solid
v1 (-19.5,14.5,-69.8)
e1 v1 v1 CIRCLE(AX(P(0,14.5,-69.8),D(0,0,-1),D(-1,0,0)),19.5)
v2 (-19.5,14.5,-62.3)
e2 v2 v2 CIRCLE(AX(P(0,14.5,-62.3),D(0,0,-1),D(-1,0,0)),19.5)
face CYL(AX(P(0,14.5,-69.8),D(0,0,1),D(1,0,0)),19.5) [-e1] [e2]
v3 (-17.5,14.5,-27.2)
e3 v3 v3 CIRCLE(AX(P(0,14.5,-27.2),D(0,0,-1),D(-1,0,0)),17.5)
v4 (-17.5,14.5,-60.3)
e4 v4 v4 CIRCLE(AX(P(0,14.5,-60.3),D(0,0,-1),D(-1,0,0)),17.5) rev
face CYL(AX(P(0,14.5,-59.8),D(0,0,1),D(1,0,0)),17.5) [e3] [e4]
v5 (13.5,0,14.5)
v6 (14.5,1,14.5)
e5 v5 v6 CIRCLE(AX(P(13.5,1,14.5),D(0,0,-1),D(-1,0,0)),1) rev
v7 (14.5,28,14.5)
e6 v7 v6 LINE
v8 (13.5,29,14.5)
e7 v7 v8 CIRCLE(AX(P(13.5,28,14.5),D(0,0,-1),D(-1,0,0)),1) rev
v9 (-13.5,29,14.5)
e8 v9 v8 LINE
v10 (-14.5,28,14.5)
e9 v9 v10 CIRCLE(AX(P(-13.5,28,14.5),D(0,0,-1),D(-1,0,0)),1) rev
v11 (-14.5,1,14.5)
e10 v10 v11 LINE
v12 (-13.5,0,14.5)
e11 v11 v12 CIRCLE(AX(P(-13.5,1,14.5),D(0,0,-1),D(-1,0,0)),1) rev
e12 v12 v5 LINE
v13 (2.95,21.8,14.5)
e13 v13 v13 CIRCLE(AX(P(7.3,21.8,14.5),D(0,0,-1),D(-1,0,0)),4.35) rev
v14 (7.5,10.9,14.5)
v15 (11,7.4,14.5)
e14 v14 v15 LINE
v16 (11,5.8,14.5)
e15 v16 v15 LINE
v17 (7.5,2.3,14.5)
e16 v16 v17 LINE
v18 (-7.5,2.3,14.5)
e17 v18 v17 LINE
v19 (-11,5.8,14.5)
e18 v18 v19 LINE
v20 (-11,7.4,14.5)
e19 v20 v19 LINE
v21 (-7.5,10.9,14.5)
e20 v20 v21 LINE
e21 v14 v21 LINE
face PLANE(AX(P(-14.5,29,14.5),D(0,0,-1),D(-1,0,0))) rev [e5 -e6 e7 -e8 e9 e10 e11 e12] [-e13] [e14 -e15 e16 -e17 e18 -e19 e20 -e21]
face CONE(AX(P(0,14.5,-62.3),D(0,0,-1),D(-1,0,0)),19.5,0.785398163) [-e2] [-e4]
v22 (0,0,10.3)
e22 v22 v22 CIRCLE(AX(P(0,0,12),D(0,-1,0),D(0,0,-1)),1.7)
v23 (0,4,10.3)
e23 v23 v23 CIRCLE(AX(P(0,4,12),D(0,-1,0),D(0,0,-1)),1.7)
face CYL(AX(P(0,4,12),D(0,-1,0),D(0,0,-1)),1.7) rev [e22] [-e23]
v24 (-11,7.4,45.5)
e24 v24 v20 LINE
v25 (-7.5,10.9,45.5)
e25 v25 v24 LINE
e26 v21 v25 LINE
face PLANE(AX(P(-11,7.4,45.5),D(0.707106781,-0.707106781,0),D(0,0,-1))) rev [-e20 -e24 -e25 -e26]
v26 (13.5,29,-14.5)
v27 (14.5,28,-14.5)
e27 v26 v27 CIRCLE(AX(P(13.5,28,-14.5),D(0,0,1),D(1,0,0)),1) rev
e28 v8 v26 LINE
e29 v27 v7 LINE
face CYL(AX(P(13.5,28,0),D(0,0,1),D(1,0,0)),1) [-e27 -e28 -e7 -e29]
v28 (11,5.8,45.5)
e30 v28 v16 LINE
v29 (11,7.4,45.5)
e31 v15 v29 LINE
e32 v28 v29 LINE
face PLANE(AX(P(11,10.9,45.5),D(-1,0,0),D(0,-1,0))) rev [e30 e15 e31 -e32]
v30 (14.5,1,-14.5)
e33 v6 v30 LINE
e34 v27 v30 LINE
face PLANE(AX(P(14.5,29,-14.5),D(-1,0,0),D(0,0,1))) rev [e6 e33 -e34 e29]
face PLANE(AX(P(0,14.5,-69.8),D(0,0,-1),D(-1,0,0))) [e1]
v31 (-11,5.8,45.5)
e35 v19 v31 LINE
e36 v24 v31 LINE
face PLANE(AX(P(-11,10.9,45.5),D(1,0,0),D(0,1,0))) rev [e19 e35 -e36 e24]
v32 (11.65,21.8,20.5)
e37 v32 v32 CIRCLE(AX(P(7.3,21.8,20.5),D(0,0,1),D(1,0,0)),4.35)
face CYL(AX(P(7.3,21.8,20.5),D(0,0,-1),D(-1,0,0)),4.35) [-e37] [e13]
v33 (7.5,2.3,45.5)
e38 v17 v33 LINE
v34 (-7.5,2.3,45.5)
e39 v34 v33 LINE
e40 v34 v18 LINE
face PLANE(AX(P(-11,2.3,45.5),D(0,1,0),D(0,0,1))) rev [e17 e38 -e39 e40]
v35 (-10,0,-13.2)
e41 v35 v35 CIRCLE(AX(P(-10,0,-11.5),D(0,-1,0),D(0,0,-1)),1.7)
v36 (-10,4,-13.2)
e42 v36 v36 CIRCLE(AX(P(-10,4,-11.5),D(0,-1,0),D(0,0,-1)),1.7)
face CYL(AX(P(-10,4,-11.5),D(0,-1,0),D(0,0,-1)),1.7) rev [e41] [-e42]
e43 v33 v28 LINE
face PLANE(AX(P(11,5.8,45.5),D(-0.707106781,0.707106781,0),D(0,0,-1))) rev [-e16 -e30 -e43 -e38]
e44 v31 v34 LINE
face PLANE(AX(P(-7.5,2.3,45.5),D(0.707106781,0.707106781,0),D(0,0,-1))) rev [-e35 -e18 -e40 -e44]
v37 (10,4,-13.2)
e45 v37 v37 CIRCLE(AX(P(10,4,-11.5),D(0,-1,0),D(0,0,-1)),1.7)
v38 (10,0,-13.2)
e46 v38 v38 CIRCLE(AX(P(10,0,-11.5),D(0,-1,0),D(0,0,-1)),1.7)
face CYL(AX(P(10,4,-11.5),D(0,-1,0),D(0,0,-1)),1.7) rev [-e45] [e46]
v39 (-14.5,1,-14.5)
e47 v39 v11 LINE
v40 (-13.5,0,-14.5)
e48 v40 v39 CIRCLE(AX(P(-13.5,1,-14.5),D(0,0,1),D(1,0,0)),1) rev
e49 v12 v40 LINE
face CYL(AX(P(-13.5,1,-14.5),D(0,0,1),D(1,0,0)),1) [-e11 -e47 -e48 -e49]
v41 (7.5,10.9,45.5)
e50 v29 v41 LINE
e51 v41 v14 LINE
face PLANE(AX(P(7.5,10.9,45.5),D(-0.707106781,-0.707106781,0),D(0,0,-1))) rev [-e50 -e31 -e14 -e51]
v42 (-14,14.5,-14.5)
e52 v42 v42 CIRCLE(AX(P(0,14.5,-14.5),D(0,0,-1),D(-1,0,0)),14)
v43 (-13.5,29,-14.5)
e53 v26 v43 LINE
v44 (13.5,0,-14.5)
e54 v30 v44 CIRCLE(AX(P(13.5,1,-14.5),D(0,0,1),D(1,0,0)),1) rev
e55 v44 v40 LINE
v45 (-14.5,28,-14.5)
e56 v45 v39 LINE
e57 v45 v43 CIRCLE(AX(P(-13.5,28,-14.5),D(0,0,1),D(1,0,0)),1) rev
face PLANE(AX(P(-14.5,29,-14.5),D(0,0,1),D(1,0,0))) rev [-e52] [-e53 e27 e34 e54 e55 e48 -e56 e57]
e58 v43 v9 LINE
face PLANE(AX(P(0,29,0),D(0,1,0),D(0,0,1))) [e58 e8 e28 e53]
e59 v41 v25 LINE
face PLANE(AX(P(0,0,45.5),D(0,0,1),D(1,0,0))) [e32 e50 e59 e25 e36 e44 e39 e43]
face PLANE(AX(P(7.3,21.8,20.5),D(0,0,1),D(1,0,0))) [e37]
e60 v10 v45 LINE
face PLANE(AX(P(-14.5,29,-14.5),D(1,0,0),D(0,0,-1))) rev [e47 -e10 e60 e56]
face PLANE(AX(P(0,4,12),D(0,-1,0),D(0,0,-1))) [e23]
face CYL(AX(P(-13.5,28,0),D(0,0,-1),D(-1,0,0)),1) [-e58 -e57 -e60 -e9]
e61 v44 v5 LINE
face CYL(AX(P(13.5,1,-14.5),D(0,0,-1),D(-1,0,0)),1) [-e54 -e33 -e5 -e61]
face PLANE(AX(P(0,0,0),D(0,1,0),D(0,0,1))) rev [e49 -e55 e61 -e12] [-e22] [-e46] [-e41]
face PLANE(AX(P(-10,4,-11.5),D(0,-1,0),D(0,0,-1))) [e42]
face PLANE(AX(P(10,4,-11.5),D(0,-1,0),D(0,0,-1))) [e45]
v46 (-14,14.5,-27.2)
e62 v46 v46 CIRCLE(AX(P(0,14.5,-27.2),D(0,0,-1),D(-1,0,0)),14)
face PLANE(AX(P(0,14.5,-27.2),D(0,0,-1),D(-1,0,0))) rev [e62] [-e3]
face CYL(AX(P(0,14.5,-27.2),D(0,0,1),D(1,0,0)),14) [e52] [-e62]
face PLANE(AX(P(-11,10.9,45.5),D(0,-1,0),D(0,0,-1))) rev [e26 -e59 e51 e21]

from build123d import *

# Parameters (mm, degrees)
SKETCH_1_W          = 29
SKETCH_1_H          = 29
EXTRUDE_1_DEPTH     = 29
SKETCH_2_R          = 1.7
CUT_EXTRUDE_1_DEPTH = 4
SKETCH_3_R          = 14
EXTRUDE_2_DEPTH     = 12.7
SKETCH_4_R          = 17.5
EXTRUDE_3_DEPTH     = 32.6
SKETCH_6_R          = 19.5
EXTRUDE_4_DEPTH     = 10
CHAMFER_1_SIZE      = 2.5
FILLET_1_R          = 1
SKETCH_7_W          = 22
SKETCH_7_H          = 8.6
EXTRUDE_5_DEPTH     = 31
SKETCH_8_R          = 4.35
EXTRUDE_6_DEPTH     = 6
CHAMFER_2_SIZE      = 3.5


with BuildPart() as part:
    # 草图1 → 凸台-拉伸1 (new body)
    with BuildSketch(Plane(origin=(0, 0, 0), x_dir=(1, 0, 0), z_dir=(0, 1, 0))):
        Rectangle(SKETCH_1_W, SKETCH_1_H)
    extrude(amount=EXTRUDE_1_DEPTH)

    # 草图2 → 切除-拉伸1 (cut)
    with BuildSketch(Plane.XZ):
        with Locations(Location((-10, -11.5, 0), (0, 0, 270))):
            Circle(SKETCH_2_R)
        with Locations(Location((10, -11.5, 0), (0, 0, 270))):
            Circle(SKETCH_2_R)
        with Locations(Location((0, 12, 0), (0, 0, 270))):
            Circle(SKETCH_2_R)
    extrude(amount=-CUT_EXTRUDE_1_DEPTH, mode=Mode.SUBTRACT)

    # 草图3 → 凸台-拉伸2 (add)
    with BuildSketch(Plane(origin=(0, 0, -14.5), x_dir=(-1, 0, 0), z_dir=(0, 0, -1))):
        with Locations((0, 14.5)):
            Circle(SKETCH_3_R)
    extrude(amount=EXTRUDE_2_DEPTH)

    # 草图4 → 凸台-拉伸3 (add)
    with BuildSketch(Plane(origin=(0, 0, -27.2), x_dir=(-1, 0, 0), z_dir=(0, 0, -1))):
        with Locations((0, 14.5)):
            Circle(SKETCH_4_R)
    extrude(amount=EXTRUDE_3_DEPTH)

    # 草图6 → 凸台-拉伸4 (add)
    with BuildSketch(Plane(origin=(0, 0, -59.8), x_dir=(-1, 0, 0), z_dir=(0, 0, -1))):
        with Locations((0, 14.5)):
            Circle(SKETCH_6_R)
    extrude(amount=EXTRUDE_4_DEPTH)

    # 倒角1
    # the kernel refuses this chamfer: 2.5 mm, written as the material it takes off along each edge
    with BuildSketch(Plane(origin=(0, 14.5, -59.8), x_dir=(-1, 0, 0), z_dir=(0, -1, 0))) as chamfer_1_piece_1_section:
        Polygon((19.5, CHAMFER_1_SIZE), (19.5 - CHAMFER_1_SIZE, 0), (19.5, 0), align=None)
    chamfer_1_piece_1 = revolve(axis=Axis((0, 14.5, -59.8), (0, 0, -1)), mode=Mode.PRIVATE)
    chamfer_1_piece_1 = chamfer_1_piece_1 - Plane(origin=(0, 14.5, -61.283957384), x_dir=(-1, 0, 0), z_dir=(0, 0, 1)) * Cylinder(17.5, 78, mode=Mode.PRIVATE)
    add(chamfer_1_piece_1, mode=Mode.SUBTRACT)

    # 圆角1
    fillet_1_edges = [part.edges().sort_by_distance(p)[0] for p in [
        (-14.5, 29, 0),
        (14.5, 29, 0),
        (-14.5, 0, 0),
        (14.5, 0, 0),
    ]]
    fillet(fillet_1_edges, radius=FILLET_1_R)

    # 草图7 → 凸台-拉伸5 (add)
    with BuildSketch(Plane.XY.offset(14.5)):
        with Locations((0, 6.6)):
            Rectangle(SKETCH_7_W, SKETCH_7_H)
    extrude(amount=EXTRUDE_5_DEPTH)

    # 草图8 → 凸台-拉伸6 (add)
    with BuildSketch(Plane.XY.offset(14.5)):
        with Locations(Location((7.3, 21.8, 0), (0, 0, 180))):
            Circle(SKETCH_8_R)
    extrude(amount=EXTRUDE_6_DEPTH)

    # 倒角2
    chamfer_2_edges = [part.edges().sort_by_distance(p)[0] for p in [
        (-11, 10.9, 30),
        (-11, 2.3, 30),
        (11, 2.3, 30),
        (11, 10.9, 30),
    ]]
    chamfer(chamfer_2_edges, length=CHAMFER_2_SIZE)


solid = part.part
